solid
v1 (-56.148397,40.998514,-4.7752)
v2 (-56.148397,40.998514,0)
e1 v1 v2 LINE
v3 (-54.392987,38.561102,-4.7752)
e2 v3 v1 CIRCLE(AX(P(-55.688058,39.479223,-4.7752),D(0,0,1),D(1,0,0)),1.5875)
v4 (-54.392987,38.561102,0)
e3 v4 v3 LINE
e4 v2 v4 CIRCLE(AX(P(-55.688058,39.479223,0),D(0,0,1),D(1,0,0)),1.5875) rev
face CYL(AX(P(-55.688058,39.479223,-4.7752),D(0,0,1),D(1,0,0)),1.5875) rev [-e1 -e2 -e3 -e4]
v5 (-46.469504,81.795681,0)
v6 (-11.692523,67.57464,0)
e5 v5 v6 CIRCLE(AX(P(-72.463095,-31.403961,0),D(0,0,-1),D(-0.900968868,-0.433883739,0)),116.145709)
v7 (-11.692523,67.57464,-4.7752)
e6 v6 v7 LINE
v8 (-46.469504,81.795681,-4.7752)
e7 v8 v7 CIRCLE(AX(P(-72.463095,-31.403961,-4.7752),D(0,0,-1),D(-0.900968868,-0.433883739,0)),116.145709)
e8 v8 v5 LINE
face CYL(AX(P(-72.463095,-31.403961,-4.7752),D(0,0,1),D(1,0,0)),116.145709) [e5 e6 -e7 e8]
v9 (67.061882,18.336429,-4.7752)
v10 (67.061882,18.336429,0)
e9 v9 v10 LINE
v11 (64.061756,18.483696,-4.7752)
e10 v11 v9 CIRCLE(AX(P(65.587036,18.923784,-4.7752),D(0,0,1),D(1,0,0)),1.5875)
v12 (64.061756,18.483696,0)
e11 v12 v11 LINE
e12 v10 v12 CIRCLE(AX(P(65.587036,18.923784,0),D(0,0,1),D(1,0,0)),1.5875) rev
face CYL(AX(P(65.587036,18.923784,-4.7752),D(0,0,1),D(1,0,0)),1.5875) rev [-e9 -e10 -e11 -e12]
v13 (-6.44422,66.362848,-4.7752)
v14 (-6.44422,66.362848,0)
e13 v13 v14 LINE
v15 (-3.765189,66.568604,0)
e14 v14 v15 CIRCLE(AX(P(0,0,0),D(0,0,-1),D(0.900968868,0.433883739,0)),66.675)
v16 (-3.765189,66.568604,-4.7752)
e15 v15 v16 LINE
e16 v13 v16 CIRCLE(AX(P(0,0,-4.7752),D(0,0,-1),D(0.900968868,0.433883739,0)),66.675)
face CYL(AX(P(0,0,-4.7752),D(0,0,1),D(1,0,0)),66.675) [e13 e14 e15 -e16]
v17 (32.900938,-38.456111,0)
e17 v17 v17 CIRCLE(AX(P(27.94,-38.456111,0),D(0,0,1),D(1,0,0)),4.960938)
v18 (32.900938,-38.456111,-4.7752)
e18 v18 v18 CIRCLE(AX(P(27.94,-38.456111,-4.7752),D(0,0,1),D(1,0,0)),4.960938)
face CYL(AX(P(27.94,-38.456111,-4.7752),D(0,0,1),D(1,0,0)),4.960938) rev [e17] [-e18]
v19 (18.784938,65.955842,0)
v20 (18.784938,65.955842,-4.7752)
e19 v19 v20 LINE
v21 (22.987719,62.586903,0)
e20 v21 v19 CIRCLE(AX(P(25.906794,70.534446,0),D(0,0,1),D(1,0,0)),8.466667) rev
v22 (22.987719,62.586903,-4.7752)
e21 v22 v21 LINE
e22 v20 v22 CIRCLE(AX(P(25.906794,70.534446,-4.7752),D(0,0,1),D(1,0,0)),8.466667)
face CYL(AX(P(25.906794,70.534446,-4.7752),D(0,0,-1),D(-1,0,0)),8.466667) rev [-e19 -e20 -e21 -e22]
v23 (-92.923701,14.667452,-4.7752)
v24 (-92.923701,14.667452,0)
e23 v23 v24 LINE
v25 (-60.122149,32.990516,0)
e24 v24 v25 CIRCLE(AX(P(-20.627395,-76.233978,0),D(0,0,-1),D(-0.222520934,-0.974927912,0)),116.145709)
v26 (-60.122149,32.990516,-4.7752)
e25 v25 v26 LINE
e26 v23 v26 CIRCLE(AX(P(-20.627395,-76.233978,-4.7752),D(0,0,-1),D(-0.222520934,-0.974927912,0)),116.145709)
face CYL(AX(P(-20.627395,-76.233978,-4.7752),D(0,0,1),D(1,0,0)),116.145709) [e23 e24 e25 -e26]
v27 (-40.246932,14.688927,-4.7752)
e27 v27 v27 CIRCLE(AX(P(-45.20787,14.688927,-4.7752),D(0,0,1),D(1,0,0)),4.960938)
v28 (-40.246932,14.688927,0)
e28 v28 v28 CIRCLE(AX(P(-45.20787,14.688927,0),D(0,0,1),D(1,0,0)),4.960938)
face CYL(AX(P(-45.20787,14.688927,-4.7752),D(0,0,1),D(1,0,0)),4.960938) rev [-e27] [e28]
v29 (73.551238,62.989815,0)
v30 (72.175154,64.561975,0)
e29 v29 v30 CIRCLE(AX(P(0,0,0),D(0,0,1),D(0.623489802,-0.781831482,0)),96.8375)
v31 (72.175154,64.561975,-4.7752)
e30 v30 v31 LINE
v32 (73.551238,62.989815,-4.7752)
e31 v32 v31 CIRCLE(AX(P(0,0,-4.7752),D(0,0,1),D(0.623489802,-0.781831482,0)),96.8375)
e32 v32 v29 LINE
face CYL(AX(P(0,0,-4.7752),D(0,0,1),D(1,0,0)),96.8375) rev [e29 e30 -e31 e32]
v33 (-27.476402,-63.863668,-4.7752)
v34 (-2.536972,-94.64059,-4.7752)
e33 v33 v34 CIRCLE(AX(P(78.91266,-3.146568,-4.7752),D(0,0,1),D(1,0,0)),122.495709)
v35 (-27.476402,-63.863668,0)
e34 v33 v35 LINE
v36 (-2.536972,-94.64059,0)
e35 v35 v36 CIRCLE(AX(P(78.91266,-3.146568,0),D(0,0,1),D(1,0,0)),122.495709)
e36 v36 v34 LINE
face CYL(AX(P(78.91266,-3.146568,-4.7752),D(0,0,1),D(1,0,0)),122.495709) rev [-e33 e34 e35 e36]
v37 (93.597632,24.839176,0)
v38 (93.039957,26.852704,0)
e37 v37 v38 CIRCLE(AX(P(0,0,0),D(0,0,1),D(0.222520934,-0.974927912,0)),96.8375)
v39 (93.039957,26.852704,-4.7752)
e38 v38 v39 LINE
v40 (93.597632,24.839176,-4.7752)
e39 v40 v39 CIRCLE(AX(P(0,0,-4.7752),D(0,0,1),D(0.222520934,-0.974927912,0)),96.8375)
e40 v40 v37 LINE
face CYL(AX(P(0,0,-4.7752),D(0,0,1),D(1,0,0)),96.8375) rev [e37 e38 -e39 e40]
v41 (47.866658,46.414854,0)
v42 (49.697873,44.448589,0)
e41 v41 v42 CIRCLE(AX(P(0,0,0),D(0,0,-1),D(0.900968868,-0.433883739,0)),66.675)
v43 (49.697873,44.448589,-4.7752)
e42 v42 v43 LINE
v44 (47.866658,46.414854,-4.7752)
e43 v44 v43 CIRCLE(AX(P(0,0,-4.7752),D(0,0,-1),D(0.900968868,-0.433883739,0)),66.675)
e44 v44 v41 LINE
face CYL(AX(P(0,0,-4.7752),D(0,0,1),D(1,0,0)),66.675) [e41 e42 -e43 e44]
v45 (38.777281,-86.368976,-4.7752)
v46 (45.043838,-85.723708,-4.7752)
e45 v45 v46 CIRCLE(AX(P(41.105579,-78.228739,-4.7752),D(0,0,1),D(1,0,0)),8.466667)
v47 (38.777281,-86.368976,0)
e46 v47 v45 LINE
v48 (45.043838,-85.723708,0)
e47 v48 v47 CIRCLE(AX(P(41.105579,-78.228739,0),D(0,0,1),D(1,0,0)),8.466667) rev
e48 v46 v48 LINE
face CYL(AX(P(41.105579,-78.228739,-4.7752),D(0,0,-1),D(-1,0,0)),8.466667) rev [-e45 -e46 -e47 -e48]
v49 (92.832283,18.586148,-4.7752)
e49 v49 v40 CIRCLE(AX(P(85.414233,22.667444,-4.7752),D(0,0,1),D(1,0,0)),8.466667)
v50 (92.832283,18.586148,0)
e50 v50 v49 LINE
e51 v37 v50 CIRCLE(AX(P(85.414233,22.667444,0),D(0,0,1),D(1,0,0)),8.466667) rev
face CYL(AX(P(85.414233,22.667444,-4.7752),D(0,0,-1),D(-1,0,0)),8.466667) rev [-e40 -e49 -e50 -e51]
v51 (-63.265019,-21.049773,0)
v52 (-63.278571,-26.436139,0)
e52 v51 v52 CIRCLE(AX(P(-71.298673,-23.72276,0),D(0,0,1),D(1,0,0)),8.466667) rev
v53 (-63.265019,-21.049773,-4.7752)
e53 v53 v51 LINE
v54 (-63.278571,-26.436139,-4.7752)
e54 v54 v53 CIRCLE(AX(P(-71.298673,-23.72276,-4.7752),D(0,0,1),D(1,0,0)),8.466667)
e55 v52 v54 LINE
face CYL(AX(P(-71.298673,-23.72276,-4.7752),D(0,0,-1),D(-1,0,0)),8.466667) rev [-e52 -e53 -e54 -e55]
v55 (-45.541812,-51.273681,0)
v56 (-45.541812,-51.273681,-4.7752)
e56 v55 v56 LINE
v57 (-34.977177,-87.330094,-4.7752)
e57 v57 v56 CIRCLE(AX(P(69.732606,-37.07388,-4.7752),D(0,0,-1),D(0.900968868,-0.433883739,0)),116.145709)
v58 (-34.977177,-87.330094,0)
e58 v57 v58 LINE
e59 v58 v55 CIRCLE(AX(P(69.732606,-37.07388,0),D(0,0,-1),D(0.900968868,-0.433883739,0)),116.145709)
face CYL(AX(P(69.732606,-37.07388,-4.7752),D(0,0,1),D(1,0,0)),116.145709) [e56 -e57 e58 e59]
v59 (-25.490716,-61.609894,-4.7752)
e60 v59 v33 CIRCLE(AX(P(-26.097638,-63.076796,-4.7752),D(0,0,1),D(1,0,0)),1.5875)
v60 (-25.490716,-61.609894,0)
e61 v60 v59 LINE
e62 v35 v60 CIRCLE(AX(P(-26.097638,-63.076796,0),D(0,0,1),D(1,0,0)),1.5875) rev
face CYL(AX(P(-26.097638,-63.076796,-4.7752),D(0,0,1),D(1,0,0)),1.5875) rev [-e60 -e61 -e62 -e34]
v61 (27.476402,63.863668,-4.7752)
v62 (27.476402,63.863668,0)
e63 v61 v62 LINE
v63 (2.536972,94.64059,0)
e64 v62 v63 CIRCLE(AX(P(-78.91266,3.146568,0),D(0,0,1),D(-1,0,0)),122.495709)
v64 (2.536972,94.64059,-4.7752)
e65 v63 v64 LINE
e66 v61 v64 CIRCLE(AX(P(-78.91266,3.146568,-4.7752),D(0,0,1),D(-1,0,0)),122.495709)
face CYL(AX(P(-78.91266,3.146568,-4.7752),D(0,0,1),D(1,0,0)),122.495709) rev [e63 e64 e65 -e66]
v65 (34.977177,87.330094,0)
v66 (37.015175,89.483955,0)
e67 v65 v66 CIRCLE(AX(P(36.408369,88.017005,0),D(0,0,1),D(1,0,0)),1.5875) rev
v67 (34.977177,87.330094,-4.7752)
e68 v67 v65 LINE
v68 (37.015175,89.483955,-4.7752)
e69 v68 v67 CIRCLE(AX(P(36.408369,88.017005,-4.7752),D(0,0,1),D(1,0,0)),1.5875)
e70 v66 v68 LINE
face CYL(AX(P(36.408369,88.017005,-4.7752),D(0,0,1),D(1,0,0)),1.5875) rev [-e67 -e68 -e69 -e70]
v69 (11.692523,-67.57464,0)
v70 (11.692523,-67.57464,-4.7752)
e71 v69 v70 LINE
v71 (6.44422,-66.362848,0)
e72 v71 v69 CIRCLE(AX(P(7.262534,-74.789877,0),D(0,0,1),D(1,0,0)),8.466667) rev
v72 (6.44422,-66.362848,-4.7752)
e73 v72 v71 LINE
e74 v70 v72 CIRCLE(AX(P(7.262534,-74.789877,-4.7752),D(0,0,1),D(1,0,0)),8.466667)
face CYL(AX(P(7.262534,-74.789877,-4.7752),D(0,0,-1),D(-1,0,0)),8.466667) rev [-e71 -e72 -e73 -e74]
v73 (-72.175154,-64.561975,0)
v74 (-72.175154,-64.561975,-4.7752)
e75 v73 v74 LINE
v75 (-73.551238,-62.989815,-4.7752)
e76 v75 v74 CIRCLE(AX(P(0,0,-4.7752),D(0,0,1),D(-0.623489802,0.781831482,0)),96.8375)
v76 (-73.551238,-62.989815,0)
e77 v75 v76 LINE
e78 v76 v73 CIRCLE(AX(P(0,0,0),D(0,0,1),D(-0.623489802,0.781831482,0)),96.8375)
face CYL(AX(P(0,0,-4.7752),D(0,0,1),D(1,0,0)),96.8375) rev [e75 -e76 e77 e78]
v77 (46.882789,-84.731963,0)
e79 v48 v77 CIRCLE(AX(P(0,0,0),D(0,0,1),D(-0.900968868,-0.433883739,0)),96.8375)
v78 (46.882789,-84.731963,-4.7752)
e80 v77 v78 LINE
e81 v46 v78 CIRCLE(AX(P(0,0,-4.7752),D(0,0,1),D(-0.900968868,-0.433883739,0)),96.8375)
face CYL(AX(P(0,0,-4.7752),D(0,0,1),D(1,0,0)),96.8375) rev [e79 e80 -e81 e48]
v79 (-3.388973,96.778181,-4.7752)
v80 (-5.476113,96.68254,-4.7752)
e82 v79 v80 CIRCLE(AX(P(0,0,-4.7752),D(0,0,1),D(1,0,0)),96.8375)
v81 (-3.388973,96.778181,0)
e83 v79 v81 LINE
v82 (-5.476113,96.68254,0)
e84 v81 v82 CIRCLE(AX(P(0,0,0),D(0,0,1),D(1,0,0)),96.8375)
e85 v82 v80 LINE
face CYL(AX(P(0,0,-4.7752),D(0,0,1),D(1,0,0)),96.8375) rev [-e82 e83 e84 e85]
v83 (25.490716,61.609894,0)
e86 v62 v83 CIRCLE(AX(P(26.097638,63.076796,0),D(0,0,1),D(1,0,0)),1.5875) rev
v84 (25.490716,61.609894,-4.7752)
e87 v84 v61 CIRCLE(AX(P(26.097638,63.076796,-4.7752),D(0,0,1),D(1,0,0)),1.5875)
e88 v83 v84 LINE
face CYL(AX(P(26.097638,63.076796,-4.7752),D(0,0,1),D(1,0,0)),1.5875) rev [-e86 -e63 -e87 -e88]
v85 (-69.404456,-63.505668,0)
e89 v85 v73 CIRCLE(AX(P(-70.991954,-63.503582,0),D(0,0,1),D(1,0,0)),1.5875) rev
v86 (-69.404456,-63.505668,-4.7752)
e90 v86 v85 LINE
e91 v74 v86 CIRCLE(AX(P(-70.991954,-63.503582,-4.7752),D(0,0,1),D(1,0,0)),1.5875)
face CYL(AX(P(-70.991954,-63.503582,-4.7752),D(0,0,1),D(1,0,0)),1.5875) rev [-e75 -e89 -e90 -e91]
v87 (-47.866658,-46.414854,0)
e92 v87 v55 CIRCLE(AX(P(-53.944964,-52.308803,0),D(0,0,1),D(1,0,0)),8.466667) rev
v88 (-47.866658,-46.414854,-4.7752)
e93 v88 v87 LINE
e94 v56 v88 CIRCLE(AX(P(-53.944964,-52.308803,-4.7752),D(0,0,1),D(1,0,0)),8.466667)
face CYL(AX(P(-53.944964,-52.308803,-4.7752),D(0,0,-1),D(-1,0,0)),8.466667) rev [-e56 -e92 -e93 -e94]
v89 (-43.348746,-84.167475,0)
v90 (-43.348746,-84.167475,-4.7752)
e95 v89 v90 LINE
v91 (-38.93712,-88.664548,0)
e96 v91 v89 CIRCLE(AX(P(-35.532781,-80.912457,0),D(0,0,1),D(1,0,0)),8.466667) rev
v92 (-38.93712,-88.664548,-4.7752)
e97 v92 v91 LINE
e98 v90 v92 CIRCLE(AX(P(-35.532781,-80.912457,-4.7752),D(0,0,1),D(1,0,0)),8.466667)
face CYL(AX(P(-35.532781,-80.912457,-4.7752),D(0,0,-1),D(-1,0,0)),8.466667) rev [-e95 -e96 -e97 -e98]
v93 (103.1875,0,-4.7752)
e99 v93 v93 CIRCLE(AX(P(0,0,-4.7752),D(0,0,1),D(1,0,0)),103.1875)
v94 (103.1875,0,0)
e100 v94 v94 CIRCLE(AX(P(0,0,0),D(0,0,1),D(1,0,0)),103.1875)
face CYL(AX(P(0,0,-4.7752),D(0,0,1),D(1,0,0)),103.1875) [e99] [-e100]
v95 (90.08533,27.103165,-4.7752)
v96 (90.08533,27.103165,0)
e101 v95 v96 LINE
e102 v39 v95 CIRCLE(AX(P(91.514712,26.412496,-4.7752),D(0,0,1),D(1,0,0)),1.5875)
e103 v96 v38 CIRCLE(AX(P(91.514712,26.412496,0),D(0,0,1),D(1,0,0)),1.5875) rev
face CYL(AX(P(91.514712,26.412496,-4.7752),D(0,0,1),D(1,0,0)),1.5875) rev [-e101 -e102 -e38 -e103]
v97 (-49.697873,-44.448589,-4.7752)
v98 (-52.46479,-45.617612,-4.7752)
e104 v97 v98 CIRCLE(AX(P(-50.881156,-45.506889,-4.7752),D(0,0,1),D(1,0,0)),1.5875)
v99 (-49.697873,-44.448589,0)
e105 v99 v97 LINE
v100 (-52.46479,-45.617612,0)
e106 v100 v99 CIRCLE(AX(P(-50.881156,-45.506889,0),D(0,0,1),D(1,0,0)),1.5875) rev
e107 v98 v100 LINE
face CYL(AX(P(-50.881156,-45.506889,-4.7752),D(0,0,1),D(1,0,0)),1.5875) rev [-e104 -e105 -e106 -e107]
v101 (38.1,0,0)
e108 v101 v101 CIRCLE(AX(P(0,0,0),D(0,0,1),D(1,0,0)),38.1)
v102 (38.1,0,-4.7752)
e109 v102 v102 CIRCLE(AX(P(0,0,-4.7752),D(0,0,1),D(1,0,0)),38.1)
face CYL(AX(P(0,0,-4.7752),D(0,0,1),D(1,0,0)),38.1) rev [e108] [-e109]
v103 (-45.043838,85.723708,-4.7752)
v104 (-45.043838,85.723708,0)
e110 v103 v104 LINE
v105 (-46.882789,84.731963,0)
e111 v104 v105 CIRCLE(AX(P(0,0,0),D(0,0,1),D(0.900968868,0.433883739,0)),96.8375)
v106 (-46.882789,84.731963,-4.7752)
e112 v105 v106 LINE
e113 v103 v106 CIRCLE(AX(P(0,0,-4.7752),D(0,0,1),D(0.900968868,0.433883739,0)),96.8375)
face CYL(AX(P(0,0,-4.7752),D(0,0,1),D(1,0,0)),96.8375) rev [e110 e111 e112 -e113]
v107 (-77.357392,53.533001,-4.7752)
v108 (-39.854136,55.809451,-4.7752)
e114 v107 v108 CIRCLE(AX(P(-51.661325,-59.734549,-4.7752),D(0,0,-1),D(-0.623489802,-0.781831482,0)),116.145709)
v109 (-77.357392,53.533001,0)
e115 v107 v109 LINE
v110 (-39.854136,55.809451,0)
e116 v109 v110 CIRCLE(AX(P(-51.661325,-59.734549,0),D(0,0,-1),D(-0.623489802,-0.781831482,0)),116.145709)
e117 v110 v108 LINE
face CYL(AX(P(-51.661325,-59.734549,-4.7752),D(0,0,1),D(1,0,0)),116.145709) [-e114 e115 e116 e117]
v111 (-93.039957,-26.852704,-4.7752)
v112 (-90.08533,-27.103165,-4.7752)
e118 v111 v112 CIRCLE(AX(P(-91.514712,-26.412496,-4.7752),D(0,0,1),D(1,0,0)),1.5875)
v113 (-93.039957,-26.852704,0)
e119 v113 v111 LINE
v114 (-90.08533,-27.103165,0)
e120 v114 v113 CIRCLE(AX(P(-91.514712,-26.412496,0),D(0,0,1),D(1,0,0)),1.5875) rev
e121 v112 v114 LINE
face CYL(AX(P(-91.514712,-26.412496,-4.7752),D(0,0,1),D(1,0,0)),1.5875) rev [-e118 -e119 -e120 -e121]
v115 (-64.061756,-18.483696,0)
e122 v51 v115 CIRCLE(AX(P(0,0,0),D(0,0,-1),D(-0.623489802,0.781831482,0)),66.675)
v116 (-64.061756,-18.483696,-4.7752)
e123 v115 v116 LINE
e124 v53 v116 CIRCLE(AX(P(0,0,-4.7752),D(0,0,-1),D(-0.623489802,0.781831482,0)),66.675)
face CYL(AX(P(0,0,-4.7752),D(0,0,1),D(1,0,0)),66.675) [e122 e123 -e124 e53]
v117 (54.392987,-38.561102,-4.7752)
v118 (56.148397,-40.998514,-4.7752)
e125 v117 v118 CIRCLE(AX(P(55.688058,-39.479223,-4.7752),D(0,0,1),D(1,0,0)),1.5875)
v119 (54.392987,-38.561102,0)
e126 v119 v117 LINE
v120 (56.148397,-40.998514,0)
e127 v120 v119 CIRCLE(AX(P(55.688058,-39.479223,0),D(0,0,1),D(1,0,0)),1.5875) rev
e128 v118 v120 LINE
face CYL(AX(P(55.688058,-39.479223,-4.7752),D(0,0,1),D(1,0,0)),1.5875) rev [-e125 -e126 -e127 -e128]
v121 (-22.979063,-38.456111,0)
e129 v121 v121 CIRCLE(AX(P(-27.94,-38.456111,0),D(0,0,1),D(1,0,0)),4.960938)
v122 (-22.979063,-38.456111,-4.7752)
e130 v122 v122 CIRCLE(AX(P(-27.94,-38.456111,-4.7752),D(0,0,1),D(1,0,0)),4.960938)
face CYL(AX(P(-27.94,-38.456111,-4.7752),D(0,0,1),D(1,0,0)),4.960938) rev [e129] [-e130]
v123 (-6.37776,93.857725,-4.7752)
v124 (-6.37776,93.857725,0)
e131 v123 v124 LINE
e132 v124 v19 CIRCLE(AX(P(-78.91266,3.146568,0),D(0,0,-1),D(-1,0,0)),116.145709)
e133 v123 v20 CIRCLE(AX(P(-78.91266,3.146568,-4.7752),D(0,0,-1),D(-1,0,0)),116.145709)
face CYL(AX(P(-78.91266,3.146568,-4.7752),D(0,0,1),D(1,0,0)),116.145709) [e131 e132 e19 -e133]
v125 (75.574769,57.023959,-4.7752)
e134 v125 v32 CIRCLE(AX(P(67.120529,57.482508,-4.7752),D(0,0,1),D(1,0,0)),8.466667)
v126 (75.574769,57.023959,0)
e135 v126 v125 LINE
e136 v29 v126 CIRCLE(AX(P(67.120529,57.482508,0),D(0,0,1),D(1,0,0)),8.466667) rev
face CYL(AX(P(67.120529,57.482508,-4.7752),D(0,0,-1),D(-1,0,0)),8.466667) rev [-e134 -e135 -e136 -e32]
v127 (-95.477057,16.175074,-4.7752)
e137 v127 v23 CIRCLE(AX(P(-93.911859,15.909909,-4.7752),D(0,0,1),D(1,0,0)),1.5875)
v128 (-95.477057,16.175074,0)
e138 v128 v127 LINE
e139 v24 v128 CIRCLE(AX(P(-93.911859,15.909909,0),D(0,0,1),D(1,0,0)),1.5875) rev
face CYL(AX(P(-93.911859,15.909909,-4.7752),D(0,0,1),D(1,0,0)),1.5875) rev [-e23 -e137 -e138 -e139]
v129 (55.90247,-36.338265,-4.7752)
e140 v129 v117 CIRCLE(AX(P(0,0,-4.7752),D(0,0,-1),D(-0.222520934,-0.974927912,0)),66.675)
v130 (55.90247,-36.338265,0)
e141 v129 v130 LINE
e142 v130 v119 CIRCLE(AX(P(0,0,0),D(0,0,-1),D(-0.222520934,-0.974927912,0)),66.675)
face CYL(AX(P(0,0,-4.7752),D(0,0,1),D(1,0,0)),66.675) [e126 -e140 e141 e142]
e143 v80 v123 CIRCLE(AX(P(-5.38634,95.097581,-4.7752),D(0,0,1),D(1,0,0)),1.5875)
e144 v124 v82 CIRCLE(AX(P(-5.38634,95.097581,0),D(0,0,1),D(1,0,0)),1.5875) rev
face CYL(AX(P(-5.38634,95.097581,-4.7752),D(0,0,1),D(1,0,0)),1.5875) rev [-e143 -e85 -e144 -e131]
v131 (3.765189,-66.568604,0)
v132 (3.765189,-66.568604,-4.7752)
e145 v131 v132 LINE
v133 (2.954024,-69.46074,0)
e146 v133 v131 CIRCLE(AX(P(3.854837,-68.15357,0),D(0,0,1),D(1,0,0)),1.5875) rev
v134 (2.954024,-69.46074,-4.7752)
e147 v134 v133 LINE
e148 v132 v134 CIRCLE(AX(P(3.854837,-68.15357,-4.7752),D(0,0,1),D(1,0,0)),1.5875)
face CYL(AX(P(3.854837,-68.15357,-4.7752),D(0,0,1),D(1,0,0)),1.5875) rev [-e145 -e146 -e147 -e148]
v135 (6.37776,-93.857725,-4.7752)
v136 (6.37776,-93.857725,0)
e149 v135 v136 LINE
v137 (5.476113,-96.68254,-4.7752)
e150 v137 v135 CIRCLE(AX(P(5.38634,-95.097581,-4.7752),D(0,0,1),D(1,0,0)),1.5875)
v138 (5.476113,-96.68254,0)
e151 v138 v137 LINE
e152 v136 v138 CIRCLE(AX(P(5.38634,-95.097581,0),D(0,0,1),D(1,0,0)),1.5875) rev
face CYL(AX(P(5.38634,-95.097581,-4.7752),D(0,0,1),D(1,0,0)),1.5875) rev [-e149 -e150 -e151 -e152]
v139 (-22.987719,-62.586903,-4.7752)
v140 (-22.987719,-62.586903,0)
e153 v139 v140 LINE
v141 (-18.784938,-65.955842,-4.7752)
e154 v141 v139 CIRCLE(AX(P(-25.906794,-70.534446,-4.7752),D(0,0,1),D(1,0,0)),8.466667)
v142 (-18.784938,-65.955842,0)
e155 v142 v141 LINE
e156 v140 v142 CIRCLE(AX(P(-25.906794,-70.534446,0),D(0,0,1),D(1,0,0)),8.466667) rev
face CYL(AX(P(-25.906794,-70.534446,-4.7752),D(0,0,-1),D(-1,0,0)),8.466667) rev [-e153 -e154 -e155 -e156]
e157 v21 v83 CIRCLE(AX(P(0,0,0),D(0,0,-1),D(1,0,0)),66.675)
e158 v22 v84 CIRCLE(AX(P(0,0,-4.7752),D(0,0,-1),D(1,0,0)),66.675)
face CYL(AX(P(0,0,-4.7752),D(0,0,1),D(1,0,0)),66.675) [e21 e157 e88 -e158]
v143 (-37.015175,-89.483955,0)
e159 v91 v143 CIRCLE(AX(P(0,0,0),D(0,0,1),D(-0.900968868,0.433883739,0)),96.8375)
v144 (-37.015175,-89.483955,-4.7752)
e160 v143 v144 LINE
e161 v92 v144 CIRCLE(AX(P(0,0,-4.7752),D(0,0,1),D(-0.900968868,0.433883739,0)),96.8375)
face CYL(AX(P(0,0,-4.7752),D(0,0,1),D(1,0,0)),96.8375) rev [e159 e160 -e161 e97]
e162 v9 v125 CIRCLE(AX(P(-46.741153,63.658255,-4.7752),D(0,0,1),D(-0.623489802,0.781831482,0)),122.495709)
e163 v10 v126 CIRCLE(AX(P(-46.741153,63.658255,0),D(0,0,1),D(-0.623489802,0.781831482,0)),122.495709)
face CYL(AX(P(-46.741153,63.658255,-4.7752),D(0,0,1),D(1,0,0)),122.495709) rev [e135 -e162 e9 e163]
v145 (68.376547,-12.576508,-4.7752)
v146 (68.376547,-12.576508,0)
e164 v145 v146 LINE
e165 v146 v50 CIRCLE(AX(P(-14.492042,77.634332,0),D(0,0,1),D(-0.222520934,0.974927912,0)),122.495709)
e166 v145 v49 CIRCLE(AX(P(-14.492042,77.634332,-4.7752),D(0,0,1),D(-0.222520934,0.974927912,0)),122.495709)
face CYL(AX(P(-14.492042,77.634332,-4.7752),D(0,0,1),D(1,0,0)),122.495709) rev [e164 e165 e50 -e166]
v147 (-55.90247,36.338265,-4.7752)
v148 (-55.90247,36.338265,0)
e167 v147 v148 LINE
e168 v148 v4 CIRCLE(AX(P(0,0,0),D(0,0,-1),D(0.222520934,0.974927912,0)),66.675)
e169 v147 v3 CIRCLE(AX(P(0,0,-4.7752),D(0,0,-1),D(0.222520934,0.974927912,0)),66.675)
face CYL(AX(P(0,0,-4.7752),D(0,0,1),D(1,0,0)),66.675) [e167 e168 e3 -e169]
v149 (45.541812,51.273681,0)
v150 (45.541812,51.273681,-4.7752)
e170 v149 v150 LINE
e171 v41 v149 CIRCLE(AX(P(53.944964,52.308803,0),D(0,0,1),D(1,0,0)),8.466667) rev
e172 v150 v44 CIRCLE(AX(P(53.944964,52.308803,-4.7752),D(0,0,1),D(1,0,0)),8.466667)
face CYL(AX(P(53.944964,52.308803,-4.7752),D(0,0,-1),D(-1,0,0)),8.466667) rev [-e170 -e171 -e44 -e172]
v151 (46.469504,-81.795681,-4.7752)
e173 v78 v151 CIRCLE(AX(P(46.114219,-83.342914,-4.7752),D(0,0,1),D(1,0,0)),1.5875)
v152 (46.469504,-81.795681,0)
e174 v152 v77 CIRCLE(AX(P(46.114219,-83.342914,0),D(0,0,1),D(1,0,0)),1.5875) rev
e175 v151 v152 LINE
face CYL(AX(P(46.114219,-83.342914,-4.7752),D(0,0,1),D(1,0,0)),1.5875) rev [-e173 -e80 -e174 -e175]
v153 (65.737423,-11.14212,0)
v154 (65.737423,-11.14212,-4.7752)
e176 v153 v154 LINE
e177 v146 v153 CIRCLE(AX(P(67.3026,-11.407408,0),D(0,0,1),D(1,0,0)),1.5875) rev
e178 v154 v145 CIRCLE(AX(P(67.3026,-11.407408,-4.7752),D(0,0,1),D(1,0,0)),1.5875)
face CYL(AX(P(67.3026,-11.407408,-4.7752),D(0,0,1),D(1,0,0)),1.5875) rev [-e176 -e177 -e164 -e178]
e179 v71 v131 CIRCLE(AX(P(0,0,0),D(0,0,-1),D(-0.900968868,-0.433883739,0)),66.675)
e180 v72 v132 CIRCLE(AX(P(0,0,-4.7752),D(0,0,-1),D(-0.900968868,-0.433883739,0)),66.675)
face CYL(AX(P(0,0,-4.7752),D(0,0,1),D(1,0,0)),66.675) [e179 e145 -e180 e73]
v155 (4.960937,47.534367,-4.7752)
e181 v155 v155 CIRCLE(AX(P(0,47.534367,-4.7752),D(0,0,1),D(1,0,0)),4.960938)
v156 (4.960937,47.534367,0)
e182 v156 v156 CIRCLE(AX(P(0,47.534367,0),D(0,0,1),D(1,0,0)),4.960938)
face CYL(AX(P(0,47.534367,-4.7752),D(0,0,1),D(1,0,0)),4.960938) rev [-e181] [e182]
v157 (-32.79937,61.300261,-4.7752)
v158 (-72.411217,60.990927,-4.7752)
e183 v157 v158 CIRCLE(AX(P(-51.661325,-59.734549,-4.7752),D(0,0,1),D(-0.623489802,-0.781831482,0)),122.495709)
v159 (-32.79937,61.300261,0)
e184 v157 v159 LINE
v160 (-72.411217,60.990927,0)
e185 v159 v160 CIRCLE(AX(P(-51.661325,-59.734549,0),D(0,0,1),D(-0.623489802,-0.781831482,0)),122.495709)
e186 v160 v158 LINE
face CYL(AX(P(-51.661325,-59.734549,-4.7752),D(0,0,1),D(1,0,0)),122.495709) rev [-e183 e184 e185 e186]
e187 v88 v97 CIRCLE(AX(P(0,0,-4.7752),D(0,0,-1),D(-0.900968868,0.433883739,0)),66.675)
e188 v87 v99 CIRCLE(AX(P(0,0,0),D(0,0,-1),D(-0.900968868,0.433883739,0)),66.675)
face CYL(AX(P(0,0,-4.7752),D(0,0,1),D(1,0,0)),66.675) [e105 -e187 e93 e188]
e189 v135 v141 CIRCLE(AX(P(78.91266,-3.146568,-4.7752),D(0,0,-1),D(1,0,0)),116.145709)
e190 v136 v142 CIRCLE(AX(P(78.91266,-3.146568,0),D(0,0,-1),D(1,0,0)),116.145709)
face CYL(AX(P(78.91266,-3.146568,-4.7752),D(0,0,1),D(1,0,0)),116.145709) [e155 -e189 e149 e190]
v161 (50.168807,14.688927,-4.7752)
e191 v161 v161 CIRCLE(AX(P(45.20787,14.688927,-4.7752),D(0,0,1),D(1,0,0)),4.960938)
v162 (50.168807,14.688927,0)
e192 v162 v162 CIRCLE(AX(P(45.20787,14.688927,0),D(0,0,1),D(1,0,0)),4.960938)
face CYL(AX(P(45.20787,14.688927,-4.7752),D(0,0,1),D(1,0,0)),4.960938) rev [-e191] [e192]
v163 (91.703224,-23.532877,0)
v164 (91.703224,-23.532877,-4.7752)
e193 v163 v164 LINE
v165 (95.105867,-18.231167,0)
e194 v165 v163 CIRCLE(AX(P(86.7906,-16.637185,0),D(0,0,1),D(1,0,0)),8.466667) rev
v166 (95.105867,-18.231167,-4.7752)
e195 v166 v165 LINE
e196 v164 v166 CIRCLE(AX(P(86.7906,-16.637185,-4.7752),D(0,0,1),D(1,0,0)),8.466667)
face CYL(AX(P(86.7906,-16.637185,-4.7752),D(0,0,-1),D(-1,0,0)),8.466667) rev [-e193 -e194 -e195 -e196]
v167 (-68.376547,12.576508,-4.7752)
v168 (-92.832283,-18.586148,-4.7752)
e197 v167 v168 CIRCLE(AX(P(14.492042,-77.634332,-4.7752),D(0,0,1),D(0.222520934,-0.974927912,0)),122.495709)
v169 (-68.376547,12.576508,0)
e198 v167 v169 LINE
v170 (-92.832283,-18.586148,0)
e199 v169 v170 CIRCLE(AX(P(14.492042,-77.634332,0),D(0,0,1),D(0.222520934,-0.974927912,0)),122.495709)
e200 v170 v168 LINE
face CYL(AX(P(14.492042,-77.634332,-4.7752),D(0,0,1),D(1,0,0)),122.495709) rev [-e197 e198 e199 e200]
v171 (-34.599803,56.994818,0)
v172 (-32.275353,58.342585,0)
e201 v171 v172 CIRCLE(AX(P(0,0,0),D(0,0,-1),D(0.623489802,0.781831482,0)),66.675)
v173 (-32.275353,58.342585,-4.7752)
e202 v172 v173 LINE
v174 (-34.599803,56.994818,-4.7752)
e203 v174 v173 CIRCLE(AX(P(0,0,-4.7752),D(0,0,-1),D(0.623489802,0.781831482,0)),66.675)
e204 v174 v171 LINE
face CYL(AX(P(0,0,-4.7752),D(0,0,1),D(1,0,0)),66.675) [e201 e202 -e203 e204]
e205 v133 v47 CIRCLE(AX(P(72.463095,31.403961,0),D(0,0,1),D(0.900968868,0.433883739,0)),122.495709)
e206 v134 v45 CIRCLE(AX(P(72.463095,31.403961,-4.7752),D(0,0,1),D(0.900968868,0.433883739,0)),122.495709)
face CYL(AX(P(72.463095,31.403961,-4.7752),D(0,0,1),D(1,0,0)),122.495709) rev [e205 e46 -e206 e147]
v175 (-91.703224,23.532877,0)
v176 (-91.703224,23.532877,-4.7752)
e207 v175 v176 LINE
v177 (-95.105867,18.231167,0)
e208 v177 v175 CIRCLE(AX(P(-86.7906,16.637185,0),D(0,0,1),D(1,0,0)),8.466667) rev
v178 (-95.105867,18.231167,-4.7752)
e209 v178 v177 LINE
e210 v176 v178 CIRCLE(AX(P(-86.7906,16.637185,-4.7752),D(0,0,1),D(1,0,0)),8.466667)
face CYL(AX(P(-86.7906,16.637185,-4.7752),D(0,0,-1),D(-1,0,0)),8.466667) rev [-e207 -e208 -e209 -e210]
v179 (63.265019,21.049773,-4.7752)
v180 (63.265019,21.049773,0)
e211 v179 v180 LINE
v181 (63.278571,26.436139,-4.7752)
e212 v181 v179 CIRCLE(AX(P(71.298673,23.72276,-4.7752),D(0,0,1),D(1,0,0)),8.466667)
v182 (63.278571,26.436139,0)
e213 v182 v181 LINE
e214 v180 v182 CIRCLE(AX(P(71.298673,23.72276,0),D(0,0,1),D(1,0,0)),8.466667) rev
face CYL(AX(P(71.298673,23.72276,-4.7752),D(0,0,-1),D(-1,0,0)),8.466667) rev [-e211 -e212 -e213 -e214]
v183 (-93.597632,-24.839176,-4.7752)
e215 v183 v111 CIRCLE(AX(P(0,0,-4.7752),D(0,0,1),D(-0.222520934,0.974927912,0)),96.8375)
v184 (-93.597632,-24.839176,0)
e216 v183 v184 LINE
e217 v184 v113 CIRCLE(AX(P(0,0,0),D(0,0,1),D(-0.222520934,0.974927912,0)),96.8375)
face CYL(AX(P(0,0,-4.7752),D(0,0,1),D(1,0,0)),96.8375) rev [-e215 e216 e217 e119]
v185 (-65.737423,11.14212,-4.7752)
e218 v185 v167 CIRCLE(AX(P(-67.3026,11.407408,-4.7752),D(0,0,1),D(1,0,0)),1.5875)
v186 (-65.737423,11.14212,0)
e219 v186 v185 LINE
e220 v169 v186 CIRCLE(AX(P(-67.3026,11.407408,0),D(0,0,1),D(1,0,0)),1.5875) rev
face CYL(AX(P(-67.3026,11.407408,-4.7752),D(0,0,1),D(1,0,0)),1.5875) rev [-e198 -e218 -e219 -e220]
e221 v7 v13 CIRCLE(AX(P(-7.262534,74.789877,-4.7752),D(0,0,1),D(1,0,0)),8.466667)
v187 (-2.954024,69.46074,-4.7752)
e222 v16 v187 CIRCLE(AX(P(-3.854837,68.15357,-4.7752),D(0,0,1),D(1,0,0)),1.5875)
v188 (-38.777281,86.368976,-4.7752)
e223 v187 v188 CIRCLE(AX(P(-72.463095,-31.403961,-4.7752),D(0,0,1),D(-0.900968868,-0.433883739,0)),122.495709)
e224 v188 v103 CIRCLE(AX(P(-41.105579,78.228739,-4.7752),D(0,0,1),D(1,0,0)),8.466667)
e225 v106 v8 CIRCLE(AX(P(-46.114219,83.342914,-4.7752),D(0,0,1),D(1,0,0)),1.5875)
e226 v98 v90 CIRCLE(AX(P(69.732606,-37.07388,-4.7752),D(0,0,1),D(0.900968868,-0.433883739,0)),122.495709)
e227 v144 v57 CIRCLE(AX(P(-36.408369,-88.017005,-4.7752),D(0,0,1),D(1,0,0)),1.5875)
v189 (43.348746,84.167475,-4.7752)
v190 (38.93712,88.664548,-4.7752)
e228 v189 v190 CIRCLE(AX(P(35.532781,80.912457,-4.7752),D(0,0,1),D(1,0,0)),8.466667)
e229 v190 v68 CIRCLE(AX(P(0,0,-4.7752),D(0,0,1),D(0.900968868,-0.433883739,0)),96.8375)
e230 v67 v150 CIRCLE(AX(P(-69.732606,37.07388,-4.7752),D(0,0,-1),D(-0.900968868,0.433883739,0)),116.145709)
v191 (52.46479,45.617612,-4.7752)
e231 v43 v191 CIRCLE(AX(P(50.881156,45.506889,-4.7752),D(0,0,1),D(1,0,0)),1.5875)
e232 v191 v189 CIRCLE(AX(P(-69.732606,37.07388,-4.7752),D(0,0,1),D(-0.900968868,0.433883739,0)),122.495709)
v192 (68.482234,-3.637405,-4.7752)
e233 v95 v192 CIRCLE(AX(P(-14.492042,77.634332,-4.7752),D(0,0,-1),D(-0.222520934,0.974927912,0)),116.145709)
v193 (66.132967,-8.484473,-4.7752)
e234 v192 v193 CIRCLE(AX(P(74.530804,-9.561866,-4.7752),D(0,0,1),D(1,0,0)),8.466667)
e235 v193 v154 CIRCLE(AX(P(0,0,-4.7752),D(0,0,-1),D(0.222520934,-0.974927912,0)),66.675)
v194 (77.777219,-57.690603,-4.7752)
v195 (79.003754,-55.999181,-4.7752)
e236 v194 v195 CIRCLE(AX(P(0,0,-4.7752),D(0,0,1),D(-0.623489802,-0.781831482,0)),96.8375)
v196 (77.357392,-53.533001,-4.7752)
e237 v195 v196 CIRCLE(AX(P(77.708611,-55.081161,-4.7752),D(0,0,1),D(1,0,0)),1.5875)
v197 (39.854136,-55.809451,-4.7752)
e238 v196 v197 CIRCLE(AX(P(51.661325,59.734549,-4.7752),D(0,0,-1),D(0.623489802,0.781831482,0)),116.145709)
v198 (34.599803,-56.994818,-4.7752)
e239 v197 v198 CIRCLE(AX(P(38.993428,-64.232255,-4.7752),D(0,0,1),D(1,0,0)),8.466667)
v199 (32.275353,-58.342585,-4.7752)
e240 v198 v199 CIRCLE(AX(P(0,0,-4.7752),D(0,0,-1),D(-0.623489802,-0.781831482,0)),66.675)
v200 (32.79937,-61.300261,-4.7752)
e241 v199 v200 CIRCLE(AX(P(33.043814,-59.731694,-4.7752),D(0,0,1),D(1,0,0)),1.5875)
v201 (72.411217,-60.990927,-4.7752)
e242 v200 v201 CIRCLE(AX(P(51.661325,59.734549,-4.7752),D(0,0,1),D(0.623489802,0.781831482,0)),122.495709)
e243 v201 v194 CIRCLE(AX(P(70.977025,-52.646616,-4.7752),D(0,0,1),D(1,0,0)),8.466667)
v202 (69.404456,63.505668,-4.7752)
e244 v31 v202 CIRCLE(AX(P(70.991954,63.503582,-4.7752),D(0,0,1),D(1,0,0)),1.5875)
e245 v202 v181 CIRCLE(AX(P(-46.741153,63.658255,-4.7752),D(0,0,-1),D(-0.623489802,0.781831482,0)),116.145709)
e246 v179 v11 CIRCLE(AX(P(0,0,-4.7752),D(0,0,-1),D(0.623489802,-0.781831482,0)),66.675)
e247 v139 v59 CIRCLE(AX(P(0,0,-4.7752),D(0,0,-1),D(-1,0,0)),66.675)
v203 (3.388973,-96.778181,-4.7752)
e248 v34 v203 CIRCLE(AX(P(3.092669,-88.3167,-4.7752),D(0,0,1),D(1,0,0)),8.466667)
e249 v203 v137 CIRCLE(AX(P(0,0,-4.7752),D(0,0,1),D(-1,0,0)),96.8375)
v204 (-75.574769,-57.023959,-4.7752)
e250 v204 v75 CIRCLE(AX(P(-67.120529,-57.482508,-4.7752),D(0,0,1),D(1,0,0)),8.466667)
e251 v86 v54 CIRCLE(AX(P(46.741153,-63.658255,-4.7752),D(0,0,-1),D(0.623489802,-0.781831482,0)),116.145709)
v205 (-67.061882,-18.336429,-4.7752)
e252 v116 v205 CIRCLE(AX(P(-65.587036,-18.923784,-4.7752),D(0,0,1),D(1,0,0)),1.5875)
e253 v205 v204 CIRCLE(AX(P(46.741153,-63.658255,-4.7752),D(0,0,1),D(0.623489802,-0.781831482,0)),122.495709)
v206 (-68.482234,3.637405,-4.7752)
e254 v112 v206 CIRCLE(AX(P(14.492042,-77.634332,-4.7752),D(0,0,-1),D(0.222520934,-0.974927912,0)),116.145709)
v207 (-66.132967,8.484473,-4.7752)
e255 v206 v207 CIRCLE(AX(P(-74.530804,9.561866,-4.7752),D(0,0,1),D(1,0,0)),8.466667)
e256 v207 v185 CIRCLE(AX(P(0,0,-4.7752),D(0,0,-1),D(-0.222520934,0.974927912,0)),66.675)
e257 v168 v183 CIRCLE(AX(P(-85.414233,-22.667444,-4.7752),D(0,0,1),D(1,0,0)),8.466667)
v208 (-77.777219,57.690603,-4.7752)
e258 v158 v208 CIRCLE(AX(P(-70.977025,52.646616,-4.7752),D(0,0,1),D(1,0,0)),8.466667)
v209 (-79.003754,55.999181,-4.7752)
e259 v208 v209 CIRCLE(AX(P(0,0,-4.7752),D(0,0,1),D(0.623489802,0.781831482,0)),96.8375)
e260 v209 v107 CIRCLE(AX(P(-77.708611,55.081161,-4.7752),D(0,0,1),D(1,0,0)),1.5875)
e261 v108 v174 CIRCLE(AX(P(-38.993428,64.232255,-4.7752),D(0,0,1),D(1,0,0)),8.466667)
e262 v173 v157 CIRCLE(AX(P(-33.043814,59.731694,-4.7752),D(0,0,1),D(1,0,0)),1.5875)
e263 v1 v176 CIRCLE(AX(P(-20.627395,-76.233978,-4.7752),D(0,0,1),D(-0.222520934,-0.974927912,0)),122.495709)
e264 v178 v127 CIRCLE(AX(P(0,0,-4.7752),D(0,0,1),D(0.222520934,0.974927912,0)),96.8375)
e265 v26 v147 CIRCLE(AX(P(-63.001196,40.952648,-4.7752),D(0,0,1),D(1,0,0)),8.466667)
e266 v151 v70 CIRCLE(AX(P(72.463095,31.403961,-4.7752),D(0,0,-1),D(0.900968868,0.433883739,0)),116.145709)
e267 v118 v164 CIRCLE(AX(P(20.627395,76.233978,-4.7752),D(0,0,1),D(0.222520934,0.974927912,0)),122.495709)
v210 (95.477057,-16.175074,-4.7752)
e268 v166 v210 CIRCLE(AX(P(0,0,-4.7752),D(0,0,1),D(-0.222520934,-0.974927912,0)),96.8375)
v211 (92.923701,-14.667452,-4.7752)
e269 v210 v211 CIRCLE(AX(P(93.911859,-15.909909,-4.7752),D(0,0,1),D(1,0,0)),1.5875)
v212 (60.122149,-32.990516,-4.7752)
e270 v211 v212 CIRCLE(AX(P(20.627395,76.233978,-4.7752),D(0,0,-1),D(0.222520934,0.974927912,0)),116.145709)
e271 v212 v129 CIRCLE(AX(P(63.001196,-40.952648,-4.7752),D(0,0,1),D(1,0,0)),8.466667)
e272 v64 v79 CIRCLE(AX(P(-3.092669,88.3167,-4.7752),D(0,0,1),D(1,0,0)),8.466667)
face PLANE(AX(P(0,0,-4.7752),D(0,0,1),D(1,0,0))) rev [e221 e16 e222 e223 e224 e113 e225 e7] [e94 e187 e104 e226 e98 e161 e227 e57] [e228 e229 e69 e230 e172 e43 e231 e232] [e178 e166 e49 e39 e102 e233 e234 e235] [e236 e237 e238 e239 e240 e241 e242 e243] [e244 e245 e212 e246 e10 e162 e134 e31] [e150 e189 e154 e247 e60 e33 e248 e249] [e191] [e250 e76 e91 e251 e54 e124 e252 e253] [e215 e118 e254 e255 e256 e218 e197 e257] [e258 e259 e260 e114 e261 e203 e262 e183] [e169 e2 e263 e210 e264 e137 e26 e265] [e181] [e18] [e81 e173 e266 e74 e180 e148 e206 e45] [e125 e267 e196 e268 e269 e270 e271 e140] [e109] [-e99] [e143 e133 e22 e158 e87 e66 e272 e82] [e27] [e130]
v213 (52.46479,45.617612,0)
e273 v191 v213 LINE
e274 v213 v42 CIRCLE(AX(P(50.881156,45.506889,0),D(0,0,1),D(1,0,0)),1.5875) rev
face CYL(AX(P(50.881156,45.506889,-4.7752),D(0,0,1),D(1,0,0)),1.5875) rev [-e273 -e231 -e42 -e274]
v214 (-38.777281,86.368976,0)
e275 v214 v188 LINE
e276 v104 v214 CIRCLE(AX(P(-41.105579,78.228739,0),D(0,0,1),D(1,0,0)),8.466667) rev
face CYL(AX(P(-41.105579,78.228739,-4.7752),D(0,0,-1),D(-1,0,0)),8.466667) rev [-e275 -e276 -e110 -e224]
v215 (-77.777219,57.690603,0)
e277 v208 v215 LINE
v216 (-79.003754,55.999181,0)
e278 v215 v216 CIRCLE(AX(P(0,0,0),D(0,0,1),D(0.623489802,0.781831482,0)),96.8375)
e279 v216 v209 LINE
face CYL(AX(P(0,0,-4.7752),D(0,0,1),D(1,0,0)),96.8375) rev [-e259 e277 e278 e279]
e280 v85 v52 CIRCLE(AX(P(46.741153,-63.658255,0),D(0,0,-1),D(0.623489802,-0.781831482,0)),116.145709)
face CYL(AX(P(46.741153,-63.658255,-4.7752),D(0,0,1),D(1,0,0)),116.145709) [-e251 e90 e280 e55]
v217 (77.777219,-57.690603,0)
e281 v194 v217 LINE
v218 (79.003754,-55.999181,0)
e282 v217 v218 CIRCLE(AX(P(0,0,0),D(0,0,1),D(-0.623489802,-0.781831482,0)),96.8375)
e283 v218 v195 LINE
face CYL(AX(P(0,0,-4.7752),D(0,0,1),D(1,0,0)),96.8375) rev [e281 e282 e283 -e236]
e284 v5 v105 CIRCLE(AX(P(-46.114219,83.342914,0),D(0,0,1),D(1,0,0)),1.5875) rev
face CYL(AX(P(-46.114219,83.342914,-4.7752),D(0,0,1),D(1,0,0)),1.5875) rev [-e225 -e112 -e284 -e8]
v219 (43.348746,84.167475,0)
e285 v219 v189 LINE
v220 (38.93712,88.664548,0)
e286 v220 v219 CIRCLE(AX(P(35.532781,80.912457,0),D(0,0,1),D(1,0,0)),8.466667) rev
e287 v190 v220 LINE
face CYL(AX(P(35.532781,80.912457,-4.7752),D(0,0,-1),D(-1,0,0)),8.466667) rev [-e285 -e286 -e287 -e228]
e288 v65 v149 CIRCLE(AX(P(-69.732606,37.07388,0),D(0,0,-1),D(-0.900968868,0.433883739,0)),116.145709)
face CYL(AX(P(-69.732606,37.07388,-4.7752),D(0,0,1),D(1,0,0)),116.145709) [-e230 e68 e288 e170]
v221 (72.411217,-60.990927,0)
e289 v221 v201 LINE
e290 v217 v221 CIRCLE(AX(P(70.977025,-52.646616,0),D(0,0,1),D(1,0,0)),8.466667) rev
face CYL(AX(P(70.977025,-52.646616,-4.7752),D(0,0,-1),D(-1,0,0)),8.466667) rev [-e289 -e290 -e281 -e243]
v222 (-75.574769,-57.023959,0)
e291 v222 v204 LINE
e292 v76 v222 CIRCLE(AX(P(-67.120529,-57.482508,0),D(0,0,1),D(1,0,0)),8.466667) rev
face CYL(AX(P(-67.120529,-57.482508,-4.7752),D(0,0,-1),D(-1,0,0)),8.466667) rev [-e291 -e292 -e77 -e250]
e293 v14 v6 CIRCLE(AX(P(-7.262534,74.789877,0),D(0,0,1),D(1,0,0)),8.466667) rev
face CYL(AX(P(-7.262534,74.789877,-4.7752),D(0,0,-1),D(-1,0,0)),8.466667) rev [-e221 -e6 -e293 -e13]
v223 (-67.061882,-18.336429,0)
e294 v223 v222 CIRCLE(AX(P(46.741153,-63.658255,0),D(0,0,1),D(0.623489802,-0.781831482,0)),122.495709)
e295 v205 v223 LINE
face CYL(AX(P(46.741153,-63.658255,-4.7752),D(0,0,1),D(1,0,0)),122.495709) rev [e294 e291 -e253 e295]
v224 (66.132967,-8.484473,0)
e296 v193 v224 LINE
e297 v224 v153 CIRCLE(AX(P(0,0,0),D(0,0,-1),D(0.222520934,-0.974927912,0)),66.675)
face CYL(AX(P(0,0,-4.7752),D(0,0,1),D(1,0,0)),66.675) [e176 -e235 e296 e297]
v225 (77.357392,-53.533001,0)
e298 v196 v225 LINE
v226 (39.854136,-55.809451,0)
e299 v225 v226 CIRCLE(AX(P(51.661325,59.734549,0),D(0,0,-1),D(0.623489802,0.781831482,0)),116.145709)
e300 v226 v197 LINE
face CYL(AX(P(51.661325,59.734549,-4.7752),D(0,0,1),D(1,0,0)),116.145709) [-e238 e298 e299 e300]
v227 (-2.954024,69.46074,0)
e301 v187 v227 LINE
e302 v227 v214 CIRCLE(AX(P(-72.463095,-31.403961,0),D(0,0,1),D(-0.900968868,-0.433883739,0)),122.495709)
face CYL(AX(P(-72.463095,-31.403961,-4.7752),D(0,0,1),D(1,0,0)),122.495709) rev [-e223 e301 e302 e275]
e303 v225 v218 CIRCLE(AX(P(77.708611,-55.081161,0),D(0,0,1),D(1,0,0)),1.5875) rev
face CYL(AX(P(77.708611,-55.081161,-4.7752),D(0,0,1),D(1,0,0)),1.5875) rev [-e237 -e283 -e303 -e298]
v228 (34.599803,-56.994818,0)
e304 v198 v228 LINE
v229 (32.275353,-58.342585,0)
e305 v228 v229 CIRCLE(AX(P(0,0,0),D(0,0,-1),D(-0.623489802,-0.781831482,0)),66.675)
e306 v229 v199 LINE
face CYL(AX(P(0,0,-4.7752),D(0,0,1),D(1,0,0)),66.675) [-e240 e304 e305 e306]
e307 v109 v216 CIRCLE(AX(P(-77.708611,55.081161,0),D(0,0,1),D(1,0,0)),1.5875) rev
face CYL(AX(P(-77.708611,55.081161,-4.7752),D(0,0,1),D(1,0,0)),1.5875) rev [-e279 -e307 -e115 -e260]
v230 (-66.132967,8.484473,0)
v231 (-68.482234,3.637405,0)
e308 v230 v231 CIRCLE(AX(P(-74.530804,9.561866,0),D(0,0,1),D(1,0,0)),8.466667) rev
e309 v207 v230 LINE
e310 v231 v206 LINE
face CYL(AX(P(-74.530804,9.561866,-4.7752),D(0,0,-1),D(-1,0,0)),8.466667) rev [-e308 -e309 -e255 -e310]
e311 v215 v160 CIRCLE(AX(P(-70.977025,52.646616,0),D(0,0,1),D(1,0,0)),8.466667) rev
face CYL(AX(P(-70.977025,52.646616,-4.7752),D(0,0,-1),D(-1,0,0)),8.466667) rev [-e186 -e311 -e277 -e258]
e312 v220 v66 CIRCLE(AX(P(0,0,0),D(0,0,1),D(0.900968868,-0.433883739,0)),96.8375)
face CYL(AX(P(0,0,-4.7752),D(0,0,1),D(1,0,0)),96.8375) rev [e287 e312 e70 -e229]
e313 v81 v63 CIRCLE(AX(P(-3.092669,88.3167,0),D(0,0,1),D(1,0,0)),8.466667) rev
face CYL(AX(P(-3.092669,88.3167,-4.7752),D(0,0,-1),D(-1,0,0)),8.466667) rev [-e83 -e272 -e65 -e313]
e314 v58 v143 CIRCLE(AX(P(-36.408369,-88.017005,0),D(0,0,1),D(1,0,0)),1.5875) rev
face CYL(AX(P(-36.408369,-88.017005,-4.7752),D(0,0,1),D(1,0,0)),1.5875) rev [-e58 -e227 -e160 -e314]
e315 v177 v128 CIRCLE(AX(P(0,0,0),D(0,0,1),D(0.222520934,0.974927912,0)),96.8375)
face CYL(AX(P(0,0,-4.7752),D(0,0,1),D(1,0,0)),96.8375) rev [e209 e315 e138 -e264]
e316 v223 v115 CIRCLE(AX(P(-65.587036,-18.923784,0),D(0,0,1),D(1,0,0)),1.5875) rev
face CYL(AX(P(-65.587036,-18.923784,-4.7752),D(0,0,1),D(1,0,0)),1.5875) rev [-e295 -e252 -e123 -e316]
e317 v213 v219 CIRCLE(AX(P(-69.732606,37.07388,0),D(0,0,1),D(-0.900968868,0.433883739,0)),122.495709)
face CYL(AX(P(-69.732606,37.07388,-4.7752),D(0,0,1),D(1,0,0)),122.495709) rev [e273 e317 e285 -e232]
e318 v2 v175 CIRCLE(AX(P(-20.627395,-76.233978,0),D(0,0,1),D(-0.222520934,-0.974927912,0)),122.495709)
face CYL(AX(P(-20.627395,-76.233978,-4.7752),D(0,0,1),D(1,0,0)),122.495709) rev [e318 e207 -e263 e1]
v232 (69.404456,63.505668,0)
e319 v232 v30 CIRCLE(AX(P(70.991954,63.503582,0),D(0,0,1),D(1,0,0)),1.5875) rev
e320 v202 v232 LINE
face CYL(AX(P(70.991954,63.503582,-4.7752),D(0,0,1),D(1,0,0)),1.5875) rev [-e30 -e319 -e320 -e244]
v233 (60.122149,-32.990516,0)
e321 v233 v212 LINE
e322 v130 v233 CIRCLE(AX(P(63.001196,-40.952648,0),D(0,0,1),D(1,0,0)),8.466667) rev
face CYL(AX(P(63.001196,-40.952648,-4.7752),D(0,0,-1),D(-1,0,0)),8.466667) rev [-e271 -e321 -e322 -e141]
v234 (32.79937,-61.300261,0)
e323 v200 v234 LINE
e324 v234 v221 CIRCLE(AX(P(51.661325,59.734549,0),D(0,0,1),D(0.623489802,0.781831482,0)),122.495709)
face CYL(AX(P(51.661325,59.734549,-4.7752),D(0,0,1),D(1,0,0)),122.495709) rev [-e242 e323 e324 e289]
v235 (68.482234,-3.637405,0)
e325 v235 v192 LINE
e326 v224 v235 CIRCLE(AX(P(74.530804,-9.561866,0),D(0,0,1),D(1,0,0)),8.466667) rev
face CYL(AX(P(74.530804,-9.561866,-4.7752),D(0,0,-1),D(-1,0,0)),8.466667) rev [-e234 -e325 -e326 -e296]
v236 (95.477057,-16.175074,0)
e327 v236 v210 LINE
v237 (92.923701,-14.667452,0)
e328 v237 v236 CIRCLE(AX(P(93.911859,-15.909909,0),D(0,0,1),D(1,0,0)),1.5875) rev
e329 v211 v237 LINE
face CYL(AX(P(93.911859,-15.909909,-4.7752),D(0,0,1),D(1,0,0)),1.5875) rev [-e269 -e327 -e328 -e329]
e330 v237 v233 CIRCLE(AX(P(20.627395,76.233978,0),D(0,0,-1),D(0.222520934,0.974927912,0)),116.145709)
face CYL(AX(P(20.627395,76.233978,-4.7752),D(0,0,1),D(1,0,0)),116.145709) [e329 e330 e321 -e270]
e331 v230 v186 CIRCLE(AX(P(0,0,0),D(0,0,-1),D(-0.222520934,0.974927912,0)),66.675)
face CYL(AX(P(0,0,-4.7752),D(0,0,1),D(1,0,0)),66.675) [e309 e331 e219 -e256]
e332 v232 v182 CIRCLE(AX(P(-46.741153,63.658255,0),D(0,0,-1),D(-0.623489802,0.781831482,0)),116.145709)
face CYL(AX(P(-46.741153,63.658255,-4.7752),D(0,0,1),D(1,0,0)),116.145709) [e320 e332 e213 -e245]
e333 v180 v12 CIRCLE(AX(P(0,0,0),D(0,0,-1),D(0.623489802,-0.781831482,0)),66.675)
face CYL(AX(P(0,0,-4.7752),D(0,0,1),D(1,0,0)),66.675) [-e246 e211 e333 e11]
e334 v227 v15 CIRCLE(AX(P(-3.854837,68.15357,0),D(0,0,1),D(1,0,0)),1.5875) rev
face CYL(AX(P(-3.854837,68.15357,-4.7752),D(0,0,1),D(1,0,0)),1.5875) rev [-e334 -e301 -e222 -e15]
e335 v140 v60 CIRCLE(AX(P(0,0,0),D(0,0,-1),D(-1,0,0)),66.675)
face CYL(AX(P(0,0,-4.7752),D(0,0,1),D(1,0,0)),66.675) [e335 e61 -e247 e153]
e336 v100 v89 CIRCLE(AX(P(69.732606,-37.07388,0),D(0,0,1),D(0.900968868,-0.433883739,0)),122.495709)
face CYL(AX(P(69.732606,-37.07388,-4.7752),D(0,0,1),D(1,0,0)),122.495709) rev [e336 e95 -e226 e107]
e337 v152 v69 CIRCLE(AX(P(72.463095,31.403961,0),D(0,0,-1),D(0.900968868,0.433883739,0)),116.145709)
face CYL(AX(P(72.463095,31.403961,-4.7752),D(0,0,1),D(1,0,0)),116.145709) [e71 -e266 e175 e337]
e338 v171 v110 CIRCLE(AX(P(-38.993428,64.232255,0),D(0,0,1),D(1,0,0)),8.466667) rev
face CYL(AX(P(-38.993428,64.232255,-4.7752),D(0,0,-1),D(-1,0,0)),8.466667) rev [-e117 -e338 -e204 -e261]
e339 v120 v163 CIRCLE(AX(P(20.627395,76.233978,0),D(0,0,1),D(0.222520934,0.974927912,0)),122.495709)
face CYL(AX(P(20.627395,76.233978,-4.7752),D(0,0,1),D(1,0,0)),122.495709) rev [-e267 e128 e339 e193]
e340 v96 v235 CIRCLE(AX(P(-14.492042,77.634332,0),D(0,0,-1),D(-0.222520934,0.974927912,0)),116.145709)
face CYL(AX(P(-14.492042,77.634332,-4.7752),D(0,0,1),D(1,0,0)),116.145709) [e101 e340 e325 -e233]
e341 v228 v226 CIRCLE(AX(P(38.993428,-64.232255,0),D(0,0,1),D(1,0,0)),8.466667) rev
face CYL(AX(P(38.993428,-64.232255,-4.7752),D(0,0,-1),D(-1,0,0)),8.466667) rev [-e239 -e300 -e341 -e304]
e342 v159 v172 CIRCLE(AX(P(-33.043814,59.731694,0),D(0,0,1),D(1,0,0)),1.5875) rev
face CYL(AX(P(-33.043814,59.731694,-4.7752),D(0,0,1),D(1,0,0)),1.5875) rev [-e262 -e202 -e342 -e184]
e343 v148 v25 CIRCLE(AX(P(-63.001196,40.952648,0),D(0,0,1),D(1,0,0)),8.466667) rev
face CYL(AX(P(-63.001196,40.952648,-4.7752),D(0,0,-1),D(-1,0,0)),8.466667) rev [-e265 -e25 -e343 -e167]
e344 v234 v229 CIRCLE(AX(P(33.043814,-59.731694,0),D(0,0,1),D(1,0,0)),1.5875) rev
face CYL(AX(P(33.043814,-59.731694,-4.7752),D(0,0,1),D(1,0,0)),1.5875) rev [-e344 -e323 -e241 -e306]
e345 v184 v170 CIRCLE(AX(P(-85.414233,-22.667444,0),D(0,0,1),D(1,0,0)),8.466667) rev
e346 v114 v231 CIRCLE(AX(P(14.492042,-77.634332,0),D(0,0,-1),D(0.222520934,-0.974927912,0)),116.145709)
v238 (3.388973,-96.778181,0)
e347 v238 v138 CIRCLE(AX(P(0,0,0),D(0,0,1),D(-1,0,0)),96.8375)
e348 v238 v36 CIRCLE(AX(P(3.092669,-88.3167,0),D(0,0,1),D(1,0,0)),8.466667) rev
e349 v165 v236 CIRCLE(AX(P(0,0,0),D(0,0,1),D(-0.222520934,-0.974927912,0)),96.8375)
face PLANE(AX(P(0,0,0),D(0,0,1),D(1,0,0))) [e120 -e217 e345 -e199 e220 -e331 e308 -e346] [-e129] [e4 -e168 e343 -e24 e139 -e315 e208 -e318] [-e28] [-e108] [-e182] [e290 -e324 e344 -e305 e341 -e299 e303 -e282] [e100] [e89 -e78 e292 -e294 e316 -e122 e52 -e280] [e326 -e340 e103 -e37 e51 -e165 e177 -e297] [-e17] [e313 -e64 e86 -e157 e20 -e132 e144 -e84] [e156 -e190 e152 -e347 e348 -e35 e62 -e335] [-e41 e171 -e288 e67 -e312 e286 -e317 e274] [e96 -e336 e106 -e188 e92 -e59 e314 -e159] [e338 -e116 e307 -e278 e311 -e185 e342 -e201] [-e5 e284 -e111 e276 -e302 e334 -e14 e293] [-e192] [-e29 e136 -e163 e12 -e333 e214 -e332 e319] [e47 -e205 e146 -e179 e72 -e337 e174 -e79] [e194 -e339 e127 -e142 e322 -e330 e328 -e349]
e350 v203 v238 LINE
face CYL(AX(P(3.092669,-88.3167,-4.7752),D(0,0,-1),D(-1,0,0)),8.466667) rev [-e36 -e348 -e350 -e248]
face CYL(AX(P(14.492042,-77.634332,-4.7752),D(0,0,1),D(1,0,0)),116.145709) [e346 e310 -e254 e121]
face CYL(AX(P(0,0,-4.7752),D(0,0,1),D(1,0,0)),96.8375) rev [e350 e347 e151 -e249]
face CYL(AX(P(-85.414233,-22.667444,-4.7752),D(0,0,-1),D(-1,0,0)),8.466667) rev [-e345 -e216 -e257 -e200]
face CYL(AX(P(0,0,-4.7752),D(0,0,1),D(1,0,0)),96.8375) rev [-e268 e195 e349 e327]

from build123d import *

# Parameters (mm, degrees)
SKETCH1_R                = 103.1875
BASE_FLANGE1_DEPTH       = 4.7752
SKETCH6_R                = 4.9609375
CUT_EXTRUDE1_DEPTH       = 147.007269845
SKETCH7_R                = 38.1
CUT_EXTRUDE2_DEPTH       = 147.007269845
CUT_EXTRUDE6_DEPTH       = 147.007269845
FILLET2_R                = 1.5875
FILLET3_R                = 8.466666667
CIRPATTERN3_COUNT        = 14
FILLET2_OF_CIRPATTERN3_R = 1.5875
FILLET3_OF_CIRPATTERN3_R = 8.466666667


# Sheet-metal steps are written as plain solids
with BuildPart() as part:
    # Sketch1 → Base-Flange1 (new body)
    with BuildSketch(Plane.XY):
        Circle(SKETCH1_R)
    extrude(amount=-BASE_FLANGE1_DEPTH)

    # Sketch6 → Cut-Extrude1 (cut, through all)
    with BuildSketch(Plane.XY):
        with Locations((0, 47.534367171)):
            Circle(SKETCH6_R)
        with Locations((45.207869646, 14.688927273)):
            Circle(SKETCH6_R)
        with Locations((27.94, -38.456110858)):
            Circle(SKETCH6_R)
        with Locations((-27.94, -38.456110858)):
            Circle(SKETCH6_R)
        with Locations((-45.207869646, 14.688927273)):
            Circle(SKETCH6_R)
    extrude(amount=-CUT_EXTRUDE1_DEPTH, mode=Mode.SUBTRACT)

    # Sketch7 → Cut-Extrude2 (cut, through all)
    with BuildSketch(Plane.XY):
        Circle(SKETCH7_R)
    extrude(amount=-CUT_EXTRUDE2_DEPTH, mode=Mode.SUBTRACT)

    # Sketch14 → Cut-Extrude6 (cut, through all)
    with BuildSketch(Plane.XY):
        with BuildLine():
            ThreePointArc((0, 96.8375), (16.707624198, 79.710005113), (29.767032143, 59.661372951))
            ThreePointArc((29.767032143, 59.661372951), (25.116422432, 61.763427279), (20.318653947, 63.50360562))
            ThreePointArc((20.318653947, 63.50360562), (6.935369559, 81.376622779), (-9.620686715, 96.358413195))
            ThreePointArc((-9.620686715, 96.358413195), (-4.816304004, 96.717654138), (0, 96.8375))
        make_face()
    cut_extrude6 = extrude(amount=-CUT_EXTRUDE6_DEPTH, mode=Mode.SUBTRACT)

    # Fillet2
    fillet2_edges = [part.edges().sort_by_distance(p)[0] for p in [
        (-9.620686715, 96.358413195, -2.3876),
        (29.767032143, 59.661372951, -2.3876),
    ]]
    fillet(fillet2_edges, radius=FILLET2_R)

    # Fillet3
    fillet3_edges = [part.edges().sort_by_distance(p)[0] for p in [
        (0, 96.8375, -2.3876),
        (20.318653947, 63.50360562, -2.3876),
    ]]
    fillet(fillet3_edges, radius=FILLET3_R)

    # CirPattern3: Cut-Extrude6 ×14 about axis
    cirpattern3_axis = Axis((0, 0, 0), (0, 0, 1))
    for i in range(1, CIRPATTERN3_COUNT):
        add(cut_extrude6.rotate(cirpattern3_axis, i * 360 / CIRPATTERN3_COUNT), mode=Mode.SUBTRACT)

    # Fillet2 of CirPattern3
    fillet2_of_cirpattern3_edges = [part.edges().sort_by_distance(p)[0] for p in [
        (-50.47628783, 82.641670924, -2.3876),
        (0.933069674, 66.668470854, -2.3876),
        (-81.33444109, 52.556732194, -2.3876),
        (-28.085698687, 60.471060469, -2.3876),
        (-96.08331079, 12.062288086, -2.3876),
        (-51.541749975, 42.296614929, -2.3876),
        (-91.801702404, -30.821240111, -2.3876),
        (-64.789325562, 15.744806069, -2.3876),
        (-69.337640983, -67.600243707, -2.3876),
        (-65.204580633, -13.92545473, -2.3876),
        (-33.140409395, -90.990189973, -2.3876),
        (-52.705268828, -40.837608436, -2.3876),
        (9.620686715, -96.358413195, -2.3876),
        (-29.767032143, -59.661372951, -2.3876),
        (50.47628783, -82.641670924, -2.3876),
        (-0.933069674, -66.668470854, -2.3876),
        (81.33444109, -52.556732194, -2.3876),
        (28.085698687, -60.471060469, -2.3876),
        (96.08331079, -12.062288086, -2.3876),
        (51.541749975, -42.296614929, -2.3876),
        (91.801702404, 30.821240111, -2.3876),
        (64.789325562, -15.744806069, -2.3876),
        (69.337640983, 67.600243707, -2.3876),
        (65.204580633, 13.92545473, -2.3876),
        (33.140409395, 90.990189973, -2.3876),
        (52.705268828, 40.837608436, -2.3876),
    ]]
    fillet(fillet2_of_cirpattern3_edges, radius=FILLET2_OF_CIRPATTERN3_R)

    # Fillet3 of CirPattern3
    fillet3_of_cirpattern3_edges = [part.edges().sort_by_distance(p)[0] for p in [
        (-42.016216587, 87.247572746, -2.3876),
        (-9.24670721, 66.030705212, -2.3876),
        (-75.710606183, 60.377193687, -2.3876),
        (-36.980644601, 55.479613823, -2.3876),
        (-94.409581696, 21.548370942, -2.3876),
        (-57.39011179, 33.940104503, -2.3876),
        (-94.409581696, -21.548370942, -2.3876),
        (-66.432763496, 5.678341239, -2.3876),
        (-75.710606183, -60.377193687, -2.3876),
        (-62.317591648, -23.708087148, -2.3876),
        (-42.016216587, -87.247572746, -2.3876),
        (-45.859656498, -48.398838115, -2.3876),
        (0, -96.8375, -2.3876),
        (-20.318653947, -63.50360562, -2.3876),
        (42.016216587, -87.247572746, -2.3876),
        (9.24670721, -66.030705212, -2.3876),
        (75.710606183, -60.377193687, -2.3876),
        (36.980644601, -55.479613823, -2.3876),
        (94.409581696, -21.548370942, -2.3876),
        (57.39011179, -33.940104503, -2.3876),
        (94.409581696, 21.548370942, -2.3876),
        (66.432763496, -5.678341239, -2.3876),
        (75.710606183, 60.377193687, -2.3876),
        (62.317591648, 23.708087148, -2.3876),
        (42.016216587, 87.247572746, -2.3876),
        (45.859656498, 48.398838115, -2.3876),
    ]]
    fillet(fillet3_of_cirpattern3_edges, radius=FILLET3_OF_CIRPATTERN3_R)


solid = part.part
